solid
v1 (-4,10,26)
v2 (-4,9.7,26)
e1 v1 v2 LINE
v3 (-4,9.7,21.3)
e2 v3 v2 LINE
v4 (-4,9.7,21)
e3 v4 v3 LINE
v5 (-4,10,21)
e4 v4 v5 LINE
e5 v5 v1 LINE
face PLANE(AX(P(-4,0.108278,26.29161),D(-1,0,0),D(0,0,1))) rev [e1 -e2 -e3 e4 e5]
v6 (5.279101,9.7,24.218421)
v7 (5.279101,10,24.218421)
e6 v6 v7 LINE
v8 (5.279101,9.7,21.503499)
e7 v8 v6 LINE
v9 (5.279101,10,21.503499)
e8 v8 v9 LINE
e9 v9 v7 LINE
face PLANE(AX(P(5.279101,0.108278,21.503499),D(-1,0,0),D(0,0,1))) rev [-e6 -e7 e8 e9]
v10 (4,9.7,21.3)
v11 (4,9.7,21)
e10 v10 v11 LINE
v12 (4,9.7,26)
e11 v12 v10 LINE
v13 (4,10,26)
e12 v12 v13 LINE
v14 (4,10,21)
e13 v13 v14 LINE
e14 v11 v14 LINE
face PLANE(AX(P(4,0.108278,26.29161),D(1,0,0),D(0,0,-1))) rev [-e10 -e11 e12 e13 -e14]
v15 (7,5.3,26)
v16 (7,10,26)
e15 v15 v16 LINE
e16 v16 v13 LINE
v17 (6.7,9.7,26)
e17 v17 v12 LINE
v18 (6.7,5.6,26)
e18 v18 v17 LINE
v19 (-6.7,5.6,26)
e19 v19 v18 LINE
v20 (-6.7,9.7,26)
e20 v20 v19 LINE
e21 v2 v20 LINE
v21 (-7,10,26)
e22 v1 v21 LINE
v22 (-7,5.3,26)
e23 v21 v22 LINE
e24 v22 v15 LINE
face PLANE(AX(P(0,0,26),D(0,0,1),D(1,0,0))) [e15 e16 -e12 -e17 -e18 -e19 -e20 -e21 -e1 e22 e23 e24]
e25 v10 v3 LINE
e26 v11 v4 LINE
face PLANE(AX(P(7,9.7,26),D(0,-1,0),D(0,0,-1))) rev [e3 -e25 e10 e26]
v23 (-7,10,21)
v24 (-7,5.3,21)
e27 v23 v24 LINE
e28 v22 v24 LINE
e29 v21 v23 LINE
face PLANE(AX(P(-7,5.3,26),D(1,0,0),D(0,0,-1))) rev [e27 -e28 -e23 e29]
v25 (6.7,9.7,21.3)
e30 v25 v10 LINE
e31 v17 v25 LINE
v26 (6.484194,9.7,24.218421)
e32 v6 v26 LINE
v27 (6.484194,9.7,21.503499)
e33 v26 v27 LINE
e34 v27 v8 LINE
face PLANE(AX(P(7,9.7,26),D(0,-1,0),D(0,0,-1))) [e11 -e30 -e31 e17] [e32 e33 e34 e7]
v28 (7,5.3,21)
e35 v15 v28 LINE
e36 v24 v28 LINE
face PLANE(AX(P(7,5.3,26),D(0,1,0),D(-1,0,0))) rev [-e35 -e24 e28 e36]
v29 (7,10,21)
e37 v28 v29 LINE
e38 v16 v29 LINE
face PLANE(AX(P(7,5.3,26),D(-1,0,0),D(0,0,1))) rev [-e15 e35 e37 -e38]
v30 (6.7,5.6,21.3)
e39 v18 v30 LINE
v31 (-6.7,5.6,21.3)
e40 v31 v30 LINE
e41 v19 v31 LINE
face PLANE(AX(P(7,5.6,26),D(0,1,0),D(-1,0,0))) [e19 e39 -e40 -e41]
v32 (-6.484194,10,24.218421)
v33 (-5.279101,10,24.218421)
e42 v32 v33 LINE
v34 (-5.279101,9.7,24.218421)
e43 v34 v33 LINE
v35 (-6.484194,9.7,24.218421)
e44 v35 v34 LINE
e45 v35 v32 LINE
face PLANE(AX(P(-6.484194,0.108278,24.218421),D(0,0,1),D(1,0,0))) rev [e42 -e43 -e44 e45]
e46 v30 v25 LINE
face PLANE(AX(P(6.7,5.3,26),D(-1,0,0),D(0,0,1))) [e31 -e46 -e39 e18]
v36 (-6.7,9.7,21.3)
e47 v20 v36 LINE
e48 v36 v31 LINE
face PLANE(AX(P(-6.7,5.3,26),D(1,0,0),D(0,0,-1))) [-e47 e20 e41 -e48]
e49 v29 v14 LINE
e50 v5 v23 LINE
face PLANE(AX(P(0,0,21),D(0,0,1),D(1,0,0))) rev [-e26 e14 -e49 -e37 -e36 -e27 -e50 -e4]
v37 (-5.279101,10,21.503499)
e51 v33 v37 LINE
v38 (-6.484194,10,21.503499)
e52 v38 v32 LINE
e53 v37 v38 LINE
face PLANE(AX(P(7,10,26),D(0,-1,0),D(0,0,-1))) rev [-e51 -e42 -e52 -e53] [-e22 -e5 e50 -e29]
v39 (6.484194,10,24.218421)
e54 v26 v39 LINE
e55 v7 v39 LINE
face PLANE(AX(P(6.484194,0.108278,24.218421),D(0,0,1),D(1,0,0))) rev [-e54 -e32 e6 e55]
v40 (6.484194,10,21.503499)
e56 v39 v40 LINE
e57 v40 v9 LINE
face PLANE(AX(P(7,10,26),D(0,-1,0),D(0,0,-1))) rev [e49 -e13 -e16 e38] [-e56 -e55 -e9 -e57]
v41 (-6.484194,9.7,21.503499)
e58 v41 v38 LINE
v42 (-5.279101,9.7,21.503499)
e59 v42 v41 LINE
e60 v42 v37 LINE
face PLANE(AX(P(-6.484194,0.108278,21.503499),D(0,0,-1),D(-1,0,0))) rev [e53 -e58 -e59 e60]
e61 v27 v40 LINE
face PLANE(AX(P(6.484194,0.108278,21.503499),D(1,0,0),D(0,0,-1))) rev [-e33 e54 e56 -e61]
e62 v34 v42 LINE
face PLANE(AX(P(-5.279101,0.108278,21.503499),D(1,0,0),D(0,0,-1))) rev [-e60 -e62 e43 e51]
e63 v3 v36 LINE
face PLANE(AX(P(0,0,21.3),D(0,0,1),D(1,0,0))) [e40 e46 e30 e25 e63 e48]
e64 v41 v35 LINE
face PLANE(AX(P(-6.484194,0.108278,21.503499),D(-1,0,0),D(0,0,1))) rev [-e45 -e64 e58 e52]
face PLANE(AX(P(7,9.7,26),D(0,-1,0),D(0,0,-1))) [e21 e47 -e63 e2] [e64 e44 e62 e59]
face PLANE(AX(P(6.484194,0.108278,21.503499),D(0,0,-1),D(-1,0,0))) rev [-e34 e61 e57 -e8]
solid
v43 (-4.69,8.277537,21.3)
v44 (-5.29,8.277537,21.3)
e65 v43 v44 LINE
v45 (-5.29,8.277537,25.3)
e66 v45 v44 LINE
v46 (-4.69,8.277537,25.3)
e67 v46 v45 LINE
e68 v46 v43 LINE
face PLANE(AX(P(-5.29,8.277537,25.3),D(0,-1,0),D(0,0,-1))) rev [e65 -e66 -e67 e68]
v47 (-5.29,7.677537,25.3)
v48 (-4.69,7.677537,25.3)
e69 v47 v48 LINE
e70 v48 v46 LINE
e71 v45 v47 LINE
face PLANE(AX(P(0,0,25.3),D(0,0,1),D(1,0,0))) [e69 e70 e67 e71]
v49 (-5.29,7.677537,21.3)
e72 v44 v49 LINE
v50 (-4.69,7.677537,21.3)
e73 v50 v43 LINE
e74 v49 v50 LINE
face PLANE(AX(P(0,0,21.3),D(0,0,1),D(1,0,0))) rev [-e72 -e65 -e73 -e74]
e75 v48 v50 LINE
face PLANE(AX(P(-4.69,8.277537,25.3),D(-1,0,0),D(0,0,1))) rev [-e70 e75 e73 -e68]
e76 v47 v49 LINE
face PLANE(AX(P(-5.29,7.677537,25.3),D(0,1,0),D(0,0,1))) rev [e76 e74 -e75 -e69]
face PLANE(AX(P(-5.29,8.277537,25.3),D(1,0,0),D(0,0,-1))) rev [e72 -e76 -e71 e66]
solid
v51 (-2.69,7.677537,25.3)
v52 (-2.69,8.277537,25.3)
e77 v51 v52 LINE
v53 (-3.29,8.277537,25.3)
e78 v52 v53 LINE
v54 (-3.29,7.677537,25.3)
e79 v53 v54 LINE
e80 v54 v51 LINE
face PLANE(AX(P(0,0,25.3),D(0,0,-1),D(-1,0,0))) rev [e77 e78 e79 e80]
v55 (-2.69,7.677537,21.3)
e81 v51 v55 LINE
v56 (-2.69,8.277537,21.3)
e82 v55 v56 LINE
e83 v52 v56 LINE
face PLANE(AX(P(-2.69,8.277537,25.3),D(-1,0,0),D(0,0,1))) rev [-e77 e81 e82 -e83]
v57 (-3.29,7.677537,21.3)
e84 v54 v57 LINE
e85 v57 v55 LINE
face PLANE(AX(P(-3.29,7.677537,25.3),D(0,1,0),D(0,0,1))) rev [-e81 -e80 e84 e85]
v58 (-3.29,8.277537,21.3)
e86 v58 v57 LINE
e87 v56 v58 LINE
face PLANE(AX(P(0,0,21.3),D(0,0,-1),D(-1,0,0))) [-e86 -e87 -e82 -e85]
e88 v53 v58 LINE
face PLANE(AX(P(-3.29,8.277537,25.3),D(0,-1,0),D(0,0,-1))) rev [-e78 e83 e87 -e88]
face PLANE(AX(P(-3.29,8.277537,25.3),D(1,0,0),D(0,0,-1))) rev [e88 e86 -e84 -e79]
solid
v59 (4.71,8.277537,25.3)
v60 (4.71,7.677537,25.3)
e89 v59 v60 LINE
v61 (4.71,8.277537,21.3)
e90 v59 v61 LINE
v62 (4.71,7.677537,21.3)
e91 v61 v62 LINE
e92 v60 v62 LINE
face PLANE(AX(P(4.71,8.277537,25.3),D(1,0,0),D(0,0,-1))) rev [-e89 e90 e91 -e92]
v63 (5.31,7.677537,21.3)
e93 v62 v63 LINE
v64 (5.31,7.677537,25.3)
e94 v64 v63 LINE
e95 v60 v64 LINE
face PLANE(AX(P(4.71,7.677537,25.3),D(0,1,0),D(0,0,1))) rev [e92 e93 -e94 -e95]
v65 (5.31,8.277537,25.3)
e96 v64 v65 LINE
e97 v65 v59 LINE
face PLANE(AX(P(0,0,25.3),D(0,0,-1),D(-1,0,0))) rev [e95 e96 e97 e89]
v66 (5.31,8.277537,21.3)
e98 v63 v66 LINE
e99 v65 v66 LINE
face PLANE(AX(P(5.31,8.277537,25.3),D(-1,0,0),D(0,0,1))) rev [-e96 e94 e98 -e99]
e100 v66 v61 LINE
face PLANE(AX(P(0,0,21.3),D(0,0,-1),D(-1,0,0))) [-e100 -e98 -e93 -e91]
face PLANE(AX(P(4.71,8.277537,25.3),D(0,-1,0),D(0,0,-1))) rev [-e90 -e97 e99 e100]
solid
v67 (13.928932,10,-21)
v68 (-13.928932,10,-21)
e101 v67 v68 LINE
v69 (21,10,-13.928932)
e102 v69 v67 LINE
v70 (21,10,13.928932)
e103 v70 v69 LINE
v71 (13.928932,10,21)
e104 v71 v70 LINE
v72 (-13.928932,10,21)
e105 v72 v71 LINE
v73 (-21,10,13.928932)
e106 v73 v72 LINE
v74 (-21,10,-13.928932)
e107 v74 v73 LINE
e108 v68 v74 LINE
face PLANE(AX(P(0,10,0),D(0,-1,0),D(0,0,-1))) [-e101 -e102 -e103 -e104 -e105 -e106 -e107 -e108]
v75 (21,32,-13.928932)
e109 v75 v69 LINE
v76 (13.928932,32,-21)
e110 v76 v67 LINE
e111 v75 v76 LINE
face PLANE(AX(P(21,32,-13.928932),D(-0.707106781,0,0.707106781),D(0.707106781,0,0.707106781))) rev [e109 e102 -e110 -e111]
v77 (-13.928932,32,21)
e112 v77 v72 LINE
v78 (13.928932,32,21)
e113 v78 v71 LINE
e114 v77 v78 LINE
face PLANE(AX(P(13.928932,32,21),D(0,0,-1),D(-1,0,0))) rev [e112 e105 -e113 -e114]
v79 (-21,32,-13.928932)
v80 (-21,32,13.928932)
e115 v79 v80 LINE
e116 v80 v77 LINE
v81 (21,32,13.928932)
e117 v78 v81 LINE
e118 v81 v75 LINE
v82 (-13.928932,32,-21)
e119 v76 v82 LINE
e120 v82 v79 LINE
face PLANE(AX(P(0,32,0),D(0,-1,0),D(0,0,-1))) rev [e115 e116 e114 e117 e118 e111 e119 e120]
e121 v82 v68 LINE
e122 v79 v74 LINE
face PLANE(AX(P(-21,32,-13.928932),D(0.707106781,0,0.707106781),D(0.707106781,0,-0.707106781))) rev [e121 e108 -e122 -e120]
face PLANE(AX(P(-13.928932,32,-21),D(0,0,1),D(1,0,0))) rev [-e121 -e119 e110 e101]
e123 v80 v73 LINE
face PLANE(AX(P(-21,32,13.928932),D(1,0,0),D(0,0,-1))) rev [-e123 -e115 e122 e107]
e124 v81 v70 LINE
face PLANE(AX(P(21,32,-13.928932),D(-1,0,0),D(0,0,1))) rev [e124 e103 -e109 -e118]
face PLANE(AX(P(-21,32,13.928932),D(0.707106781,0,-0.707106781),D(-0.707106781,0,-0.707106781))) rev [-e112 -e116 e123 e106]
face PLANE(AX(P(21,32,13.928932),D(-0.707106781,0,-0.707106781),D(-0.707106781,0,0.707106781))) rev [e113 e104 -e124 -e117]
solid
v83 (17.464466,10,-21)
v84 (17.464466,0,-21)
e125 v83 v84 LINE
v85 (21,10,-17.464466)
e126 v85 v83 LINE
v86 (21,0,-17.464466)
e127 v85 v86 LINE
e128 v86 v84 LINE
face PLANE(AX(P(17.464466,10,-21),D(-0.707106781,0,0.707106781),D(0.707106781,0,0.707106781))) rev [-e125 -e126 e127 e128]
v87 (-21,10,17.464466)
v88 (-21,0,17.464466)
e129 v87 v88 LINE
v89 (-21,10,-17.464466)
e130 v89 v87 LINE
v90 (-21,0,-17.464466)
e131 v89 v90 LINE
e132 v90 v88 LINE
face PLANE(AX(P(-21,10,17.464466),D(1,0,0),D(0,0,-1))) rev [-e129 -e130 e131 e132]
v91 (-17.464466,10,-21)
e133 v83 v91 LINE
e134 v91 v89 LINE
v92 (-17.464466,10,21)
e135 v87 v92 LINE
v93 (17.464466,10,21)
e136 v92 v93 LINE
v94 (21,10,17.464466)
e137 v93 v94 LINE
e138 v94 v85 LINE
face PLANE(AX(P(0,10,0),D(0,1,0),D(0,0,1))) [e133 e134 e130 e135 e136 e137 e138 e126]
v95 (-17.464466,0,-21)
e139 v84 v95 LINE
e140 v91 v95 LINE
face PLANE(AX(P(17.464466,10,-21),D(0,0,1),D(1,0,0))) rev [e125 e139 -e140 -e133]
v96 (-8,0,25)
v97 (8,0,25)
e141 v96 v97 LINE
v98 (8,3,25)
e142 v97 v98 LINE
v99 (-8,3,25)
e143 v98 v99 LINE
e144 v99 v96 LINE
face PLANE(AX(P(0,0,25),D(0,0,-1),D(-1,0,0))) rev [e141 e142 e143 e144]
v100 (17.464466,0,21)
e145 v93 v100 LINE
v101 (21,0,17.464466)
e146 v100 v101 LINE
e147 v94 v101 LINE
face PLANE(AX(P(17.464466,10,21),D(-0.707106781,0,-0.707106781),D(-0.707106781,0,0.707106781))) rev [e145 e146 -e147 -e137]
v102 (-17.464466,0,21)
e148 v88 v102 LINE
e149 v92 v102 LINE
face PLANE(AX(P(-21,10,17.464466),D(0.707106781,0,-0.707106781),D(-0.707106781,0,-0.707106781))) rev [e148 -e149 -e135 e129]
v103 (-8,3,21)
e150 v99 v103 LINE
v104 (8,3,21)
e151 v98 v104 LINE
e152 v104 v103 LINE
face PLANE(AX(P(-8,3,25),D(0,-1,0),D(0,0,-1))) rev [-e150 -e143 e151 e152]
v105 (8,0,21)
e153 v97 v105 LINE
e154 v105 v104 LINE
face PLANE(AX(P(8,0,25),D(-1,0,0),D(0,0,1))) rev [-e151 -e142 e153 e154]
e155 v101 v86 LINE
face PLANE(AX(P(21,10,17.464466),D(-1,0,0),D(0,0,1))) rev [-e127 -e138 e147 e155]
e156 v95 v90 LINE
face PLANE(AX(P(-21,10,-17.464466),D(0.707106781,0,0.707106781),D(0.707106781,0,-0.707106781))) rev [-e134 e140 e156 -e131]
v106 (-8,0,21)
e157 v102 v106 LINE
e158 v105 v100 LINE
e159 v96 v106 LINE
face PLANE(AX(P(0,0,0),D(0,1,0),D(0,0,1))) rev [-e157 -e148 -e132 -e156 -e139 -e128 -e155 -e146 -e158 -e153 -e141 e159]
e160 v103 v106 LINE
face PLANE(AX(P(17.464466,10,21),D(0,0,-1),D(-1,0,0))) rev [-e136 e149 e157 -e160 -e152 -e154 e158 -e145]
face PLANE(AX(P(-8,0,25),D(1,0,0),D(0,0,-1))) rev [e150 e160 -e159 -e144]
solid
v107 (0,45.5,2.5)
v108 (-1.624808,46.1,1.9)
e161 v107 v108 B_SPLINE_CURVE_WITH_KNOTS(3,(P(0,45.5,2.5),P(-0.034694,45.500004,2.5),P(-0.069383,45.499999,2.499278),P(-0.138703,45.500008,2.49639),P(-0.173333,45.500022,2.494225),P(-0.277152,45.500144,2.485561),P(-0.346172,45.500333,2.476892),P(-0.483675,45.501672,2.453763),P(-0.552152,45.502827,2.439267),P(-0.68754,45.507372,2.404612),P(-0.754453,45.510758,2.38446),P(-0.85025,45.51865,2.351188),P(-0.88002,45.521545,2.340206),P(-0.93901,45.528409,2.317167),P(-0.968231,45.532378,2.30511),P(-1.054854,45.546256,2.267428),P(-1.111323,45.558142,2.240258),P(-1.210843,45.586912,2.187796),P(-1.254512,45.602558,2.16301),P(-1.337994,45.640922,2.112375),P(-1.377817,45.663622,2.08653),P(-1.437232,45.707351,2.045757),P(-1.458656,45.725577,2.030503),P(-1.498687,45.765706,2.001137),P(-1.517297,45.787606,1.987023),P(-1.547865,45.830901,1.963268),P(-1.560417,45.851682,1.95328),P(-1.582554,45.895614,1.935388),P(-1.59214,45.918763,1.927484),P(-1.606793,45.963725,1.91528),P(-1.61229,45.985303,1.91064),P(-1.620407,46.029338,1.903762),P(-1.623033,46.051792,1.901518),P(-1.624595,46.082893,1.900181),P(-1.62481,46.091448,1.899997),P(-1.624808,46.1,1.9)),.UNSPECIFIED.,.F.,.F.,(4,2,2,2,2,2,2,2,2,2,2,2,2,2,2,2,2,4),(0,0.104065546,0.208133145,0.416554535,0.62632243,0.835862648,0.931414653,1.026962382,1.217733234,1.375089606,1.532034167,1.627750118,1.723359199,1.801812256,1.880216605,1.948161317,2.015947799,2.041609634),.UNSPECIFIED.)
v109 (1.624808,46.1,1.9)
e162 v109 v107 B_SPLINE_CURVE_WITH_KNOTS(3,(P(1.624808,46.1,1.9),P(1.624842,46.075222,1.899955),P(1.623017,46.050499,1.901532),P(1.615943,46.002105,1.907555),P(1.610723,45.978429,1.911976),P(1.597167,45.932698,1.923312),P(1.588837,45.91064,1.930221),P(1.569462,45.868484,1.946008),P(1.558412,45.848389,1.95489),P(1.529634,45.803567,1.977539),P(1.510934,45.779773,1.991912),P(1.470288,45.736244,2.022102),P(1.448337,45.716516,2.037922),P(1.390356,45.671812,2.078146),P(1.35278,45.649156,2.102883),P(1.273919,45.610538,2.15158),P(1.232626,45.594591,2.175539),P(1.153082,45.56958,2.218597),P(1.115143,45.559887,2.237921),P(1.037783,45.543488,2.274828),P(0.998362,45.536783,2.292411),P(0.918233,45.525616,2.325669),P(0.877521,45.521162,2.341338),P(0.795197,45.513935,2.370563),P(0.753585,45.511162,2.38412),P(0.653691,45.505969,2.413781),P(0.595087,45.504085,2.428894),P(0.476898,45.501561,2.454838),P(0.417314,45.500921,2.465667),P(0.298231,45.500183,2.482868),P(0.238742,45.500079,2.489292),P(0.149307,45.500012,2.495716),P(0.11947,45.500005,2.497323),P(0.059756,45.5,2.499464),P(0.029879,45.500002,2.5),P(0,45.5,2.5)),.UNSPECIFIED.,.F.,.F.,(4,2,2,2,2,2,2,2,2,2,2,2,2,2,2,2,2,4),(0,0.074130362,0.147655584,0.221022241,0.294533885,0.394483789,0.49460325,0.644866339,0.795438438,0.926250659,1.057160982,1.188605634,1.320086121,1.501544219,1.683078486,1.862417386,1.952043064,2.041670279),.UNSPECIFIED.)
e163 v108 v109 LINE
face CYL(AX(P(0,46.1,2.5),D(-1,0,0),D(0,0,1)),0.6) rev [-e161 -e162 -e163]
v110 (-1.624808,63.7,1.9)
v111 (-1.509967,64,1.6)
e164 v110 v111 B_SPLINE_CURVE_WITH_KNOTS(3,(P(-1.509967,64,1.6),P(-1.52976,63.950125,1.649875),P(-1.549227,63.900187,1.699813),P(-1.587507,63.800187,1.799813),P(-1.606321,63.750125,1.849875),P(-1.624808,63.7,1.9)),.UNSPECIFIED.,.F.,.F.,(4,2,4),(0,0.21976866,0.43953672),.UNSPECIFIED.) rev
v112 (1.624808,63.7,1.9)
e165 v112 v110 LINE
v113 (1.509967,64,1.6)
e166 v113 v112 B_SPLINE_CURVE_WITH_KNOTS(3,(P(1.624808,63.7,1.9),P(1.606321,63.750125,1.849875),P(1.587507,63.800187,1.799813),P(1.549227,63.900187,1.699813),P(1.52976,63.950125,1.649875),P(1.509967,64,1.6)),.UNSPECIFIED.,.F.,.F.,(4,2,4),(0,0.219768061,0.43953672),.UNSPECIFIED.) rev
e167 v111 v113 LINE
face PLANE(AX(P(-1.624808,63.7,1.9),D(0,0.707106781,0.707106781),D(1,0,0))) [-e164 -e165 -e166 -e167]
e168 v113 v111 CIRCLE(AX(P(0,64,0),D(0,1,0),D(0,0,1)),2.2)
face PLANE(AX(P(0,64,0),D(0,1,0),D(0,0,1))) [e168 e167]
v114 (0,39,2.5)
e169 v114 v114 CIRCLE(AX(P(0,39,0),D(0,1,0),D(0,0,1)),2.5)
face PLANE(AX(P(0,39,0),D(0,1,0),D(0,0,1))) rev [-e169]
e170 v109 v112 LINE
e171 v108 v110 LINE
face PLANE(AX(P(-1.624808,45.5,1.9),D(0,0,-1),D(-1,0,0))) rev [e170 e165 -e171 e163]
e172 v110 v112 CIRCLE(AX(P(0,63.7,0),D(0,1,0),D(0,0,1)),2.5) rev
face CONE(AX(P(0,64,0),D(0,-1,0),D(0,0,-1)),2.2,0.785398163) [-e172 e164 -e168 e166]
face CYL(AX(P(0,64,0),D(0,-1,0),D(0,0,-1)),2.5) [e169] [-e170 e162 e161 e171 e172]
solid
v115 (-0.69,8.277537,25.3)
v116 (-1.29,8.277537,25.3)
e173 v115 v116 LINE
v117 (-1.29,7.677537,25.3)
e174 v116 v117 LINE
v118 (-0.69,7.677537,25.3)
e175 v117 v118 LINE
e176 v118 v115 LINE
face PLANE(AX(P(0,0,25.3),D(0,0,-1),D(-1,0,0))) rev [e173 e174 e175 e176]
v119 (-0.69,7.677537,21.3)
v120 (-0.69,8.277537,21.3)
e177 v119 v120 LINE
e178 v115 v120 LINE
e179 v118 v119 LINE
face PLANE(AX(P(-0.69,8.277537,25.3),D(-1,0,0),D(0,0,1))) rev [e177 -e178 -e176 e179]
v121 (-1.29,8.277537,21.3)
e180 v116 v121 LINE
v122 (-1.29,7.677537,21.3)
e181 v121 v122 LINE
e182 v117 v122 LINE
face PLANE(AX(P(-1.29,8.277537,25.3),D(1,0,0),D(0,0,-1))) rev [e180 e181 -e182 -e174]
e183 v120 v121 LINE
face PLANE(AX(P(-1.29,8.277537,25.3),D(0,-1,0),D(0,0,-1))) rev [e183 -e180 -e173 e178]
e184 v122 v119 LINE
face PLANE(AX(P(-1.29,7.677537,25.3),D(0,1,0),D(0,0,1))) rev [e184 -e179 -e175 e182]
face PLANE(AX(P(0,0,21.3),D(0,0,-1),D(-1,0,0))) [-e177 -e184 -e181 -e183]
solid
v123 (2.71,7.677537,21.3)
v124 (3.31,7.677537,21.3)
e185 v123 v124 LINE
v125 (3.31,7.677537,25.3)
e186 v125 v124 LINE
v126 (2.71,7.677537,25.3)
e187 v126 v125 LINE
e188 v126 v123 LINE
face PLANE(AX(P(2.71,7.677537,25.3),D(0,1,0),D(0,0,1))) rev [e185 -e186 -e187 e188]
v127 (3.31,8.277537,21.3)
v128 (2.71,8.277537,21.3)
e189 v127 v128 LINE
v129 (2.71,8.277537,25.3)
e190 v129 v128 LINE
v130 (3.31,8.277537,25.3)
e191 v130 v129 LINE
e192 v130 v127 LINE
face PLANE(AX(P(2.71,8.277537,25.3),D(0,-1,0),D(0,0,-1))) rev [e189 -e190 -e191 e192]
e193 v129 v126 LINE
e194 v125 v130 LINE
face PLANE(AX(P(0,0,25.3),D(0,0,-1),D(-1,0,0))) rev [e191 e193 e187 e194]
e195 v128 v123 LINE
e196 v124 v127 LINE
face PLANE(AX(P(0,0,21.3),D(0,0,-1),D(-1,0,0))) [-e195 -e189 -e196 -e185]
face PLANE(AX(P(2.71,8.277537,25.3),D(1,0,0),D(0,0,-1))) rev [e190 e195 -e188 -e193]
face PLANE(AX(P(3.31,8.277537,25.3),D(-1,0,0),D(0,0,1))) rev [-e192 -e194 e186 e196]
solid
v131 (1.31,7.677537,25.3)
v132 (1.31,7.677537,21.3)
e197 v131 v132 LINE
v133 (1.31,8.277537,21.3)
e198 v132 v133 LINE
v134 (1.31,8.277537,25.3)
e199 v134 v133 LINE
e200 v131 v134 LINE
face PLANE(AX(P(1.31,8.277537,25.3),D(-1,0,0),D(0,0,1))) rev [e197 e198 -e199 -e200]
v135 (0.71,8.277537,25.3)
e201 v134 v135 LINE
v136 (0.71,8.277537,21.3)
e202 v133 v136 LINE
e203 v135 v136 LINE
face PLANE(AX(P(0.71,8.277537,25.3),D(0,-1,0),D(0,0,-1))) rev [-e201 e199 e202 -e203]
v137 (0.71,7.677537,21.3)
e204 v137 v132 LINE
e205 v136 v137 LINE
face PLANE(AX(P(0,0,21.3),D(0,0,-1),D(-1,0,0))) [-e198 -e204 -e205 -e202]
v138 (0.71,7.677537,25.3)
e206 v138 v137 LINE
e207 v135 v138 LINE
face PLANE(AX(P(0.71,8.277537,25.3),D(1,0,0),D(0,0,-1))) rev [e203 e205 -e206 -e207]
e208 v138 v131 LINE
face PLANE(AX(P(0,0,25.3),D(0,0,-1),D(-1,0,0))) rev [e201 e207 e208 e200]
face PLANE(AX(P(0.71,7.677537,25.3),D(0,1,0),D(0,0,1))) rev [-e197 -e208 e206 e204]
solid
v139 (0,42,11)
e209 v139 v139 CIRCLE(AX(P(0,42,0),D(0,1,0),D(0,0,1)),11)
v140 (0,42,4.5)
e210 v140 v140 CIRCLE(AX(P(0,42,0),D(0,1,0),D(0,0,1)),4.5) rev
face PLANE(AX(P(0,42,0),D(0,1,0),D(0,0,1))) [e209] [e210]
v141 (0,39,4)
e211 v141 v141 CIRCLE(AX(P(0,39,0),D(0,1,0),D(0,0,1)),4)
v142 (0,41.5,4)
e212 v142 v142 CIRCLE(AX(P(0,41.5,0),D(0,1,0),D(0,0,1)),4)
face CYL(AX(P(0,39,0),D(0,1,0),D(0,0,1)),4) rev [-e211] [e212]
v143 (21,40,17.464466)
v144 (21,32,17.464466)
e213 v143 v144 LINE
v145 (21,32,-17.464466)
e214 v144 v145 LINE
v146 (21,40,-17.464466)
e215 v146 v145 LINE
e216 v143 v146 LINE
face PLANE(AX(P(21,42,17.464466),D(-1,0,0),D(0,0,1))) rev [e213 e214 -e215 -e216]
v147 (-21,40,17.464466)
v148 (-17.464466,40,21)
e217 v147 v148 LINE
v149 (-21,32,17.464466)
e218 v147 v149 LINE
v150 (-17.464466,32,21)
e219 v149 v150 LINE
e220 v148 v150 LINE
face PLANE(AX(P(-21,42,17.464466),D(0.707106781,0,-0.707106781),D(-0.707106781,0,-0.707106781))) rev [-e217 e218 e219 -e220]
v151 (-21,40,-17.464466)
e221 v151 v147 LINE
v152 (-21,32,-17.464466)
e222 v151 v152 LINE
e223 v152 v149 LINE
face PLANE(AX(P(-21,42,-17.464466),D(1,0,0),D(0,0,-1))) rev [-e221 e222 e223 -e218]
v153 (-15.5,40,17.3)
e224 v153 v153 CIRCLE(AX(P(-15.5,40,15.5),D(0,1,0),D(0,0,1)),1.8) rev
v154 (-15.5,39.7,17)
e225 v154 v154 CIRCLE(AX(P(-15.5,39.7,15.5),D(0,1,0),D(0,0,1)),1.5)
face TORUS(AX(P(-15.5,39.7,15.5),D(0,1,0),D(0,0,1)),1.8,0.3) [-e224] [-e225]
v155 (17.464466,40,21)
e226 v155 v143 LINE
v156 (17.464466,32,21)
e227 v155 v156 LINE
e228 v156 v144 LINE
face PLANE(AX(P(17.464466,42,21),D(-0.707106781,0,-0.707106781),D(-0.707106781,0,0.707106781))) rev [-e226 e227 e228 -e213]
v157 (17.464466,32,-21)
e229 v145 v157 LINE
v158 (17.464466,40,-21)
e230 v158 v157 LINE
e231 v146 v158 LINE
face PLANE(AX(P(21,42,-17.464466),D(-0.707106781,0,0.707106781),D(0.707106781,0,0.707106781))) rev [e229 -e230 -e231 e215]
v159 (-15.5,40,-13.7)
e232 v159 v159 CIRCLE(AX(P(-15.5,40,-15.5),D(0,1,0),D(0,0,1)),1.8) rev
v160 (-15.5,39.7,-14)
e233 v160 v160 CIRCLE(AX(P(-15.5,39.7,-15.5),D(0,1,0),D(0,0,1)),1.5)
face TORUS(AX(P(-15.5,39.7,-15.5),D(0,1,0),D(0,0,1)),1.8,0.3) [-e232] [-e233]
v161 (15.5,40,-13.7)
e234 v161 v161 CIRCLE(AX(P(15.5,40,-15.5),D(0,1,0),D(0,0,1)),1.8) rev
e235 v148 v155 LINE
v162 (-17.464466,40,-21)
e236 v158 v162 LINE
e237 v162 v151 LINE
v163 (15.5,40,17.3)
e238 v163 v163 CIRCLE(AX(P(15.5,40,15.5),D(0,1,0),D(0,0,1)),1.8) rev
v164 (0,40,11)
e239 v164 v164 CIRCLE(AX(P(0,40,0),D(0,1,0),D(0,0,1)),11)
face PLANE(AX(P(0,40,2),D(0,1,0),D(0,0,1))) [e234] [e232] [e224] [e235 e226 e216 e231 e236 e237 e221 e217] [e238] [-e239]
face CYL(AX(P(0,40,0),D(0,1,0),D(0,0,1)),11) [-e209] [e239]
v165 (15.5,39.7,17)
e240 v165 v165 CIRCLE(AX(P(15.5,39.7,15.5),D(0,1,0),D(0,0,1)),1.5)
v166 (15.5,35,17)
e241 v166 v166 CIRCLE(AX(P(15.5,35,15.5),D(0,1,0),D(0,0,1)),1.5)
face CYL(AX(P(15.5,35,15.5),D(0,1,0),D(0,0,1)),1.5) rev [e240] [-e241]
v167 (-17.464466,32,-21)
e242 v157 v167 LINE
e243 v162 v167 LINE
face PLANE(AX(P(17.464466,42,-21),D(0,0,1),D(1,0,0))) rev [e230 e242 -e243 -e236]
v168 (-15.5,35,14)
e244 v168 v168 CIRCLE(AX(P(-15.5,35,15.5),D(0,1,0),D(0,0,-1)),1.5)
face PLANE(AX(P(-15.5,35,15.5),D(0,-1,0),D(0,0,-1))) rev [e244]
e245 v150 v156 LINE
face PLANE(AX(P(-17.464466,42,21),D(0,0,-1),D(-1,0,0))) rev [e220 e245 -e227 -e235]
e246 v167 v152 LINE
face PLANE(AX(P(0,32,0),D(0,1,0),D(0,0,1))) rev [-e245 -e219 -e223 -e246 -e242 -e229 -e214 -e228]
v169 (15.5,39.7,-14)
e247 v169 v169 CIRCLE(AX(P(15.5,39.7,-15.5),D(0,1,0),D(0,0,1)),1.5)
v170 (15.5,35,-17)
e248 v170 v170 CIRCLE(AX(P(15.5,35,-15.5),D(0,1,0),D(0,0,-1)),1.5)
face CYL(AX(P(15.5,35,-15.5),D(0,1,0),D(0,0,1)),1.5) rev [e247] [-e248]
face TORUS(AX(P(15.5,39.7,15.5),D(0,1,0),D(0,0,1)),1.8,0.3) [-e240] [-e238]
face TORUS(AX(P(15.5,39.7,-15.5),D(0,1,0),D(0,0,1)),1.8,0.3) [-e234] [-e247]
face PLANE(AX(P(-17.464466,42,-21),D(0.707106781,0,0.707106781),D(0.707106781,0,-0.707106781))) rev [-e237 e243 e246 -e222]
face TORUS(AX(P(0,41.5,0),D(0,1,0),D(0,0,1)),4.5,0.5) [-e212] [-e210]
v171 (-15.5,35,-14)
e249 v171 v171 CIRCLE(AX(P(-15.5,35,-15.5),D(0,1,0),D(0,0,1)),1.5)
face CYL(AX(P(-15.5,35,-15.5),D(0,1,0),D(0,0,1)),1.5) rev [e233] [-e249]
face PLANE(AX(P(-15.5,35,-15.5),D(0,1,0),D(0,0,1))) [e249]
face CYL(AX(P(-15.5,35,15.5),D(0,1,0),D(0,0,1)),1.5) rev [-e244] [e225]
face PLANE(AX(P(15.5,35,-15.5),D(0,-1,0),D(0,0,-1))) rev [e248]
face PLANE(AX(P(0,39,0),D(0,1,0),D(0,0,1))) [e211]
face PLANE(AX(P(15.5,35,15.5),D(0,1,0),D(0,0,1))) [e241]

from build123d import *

# Parameters (mm, degrees)
BOTTOM_DEPTH           = 10
MIDDLE_DEPTH           = 22
TOP_DEPTH              = 10
SKETCH4_W              = 16
SKETCH4_H              = 3
JST_EXTENSION_DEPTH    = 4
SKETCH5_OUTSIDE_W      = 59.026
SKETCH5_OUTSIDE_H      = 63.026
SKETCH5_OUTSIDE_R      = 11
TOP_TRIM_DEPTH         = 2
SKETCH9_R              = 1.5
MOUNT_DEPTH            = 5
SKETCH6_R              = 4
SHAFT_RECESS_DEPTH     = 3
SKETCH7_R              = 2.5
SHAFT_DEPTH            = 25
D_SHAFT_TRIM_DEPTH     = 18.5
SHAFT_TOP_CHAMFER_SIZE = 0.3
SKETCH10_W             = 14
SKETCH10_H             = 4.7
JST_DEPTH              = 5
JST_SHELL_T            = -0.3
SKETCH11_W             = 8
SKETCH11_H             = 5.2916096
SKETCH11_W_2           = 1.205092783
SKETCH11_H_2           = 2.714921674
JST_SHAPER_DEPTH       = 0.3
SKETCH12_W             = 0.6
SKETCH12_H             = 0.6
JST_PINS_DEPTH         = 4
JST_PINS_2_DEPTH       = 4
JST_PINS_3_DEPTH       = 4
JST_PINS_4_DEPTH       = 4
JST_PINS_5_DEPTH       = 4
JST_PINS_6_DEPTH       = 4
FILLET2_R              = 0.5
FILLET3_R              = 0.3
FILLET4_R              = 0.6


with BuildPart() as part:
    # Sketch1 → bottom (new body)
    with BuildSketch(Plane(origin=(0, 0, 0), x_dir=(1, 0, 0), z_dir=(0, 1, 0))):
        Polygon((-21, 17.464466094), (-17.464466094, 21), (17.464466094, 21), (21, 17.464466094), (21, -17.464466094), (17.464466094, -21), (-17.464466094, -21), (-21, -17.464466094), align=None)
    extrude(amount=BOTTOM_DEPTH)

    # Sketch4 → JST_extension (add)
    with BuildSketch(Plane.XY.offset(21)):
        with Locations((0, 1.5)):
            Rectangle(SKETCH4_W, SKETCH4_H)
    extrude(amount=JST_EXTENSION_DEPTH)


with BuildPart() as body_2:
    # Sketch2 → middle (new body)
    with BuildSketch(Plane(origin=(0, 10, 0), x_dir=(1, 0, 0), z_dir=(0, 1, 0))):
        Polygon((-21, 13.928932188), (-13.928932188, 21), (13.928932188, 21), (21, 13.928932188), (21, -13.928932188), (13.928932188, -21), (-13.928932188, -21), (-21, -13.928932188), align=None)
    extrude(amount=MIDDLE_DEPTH)


with BuildPart() as body_3:
    # Sketch3 → top (new body)
    with BuildSketch(Plane(origin=(0, 32, 0), x_dir=(1, 0, 0), z_dir=(0, 1, 0))):
        Polygon((-21, 17.464466094), (-21, -17.464466094), (-17.464466094, -21), (17.464466094, -21), (21, -17.464466094), (21, 17.464466094), (17.464466094, 21), (-17.464466094, 21), align=None)
    extrude(amount=TOP_DEPTH)

    # Sketch5 outside → top trim (cut)
    with BuildSketch(Plane(origin=(0, 42, 0), x_dir=(1, 0, 0), z_dir=(0, 1, 0))):
        with Locations((0, -2)):
            Rectangle(SKETCH5_OUTSIDE_W, SKETCH5_OUTSIDE_H)
        with Locations(Location((0, 0, 0), (0, 0, 270))):
            Circle(SKETCH5_OUTSIDE_R, mode=Mode.SUBTRACT)
    extrude(amount=-TOP_TRIM_DEPTH, mode=Mode.SUBTRACT)

    # Sketch9 → mount (cut)
    with BuildSketch(Plane(origin=(0, 40, 0), x_dir=(1, 0, 0), z_dir=(0, 1, 0))):
        with Locations(Location((-15.5, 15.5, 0), (0, 0, 270))):
            Circle(SKETCH9_R)
        with Locations(Location((15.5, 15.5, 0), (0, 0, 90))):
            Circle(SKETCH9_R)
        with Locations(Location((-15.5, -15.5, 0), (0, 0, 90))):
            Circle(SKETCH9_R)
        with Locations(Location((15.5, -15.5, 0), (0, 0, 270))):
            Circle(SKETCH9_R)
    extrude(amount=-MOUNT_DEPTH, mode=Mode.SUBTRACT)

    # Sketch6 → shaft_recess (cut)
    with BuildSketch(Plane(origin=(0, 42, 0), x_dir=(1, 0, 0), z_dir=(0, 1, 0))):
        with Locations(Location((0, 0, 0), (0, 0, 270))):
            Circle(SKETCH6_R)
    extrude(amount=-SHAFT_RECESS_DEPTH, mode=Mode.SUBTRACT)

    # Fillet2
    fillet2_edges = [body_3.edges().sort_by_distance(p)[0] for p in [
        (0, 42, -4),
    ]]
    fillet(fillet2_edges, radius=FILLET2_R)

    # Fillet3
    fillet3_edges = [body_3.edges().sort_by_distance(p)[0] for p in [
        (15.5, 40, -14),
        (-15.5, 40, 17),
        (15.5, 40, 14),
        (-15.5, 40, -17),
    ]]
    fillet(fillet3_edges, radius=FILLET3_R)


with BuildPart() as body_4:
    # Sketch7 → shaft (new body)
    with BuildSketch(Plane(origin=(0, 39, 0), x_dir=(1, 0, 0), z_dir=(0, 1, 0))):
        with Locations(Location((0, 0, 0), (0, 0, 270))):
            Circle(SKETCH7_R)
    extrude(amount=SHAFT_DEPTH)

    # Sketch8 → D_shaft_trim (cut)
    with BuildSketch(Plane(origin=(0, 64, 0), x_dir=(1, 0, 0), z_dir=(0, 1, 0))):
        with BuildLine():
            Line((-1.624807681, -1.9), (1.624807681, -1.9))
            ThreePointArc((1.624807681, -1.9), (0, -2.5), (-1.624807681, -1.9))
        make_face()
    extrude(amount=-D_SHAFT_TRIM_DEPTH, mode=Mode.SUBTRACT)

    # shaft_top_chamfer
    shaft_top_chamfer_edges = [body_4.edges().sort_by_distance(p)[0] for p in [
        (0, 64, -2.5),
        (0, 64, 1.9),
    ]]
    chamfer(shaft_top_chamfer_edges, length=SHAFT_TOP_CHAMFER_SIZE)

    # Fillet4
    fillet4_edges = [body_4.edges().sort_by_distance(p)[0] for p in [
        (0, 45.5, 1.9),
    ]]
    fillet(fillet4_edges, radius=FILLET4_R - 0.0001)  # a hair under: the kernel refuses the full size


with BuildPart() as body_5:
    # Sketch10 → JST (new body)
    with BuildSketch(Plane.XY.offset(21)):
        with Locations((0, 7.65)):
            Rectangle(SKETCH10_W, SKETCH10_H)
    extrude(amount=JST_DEPTH)

    # JST_shell
    jst_shell_openings = [body_5.faces().sort_by_distance(p)[0] for p in [
        (0, 7.65, 26),
    ]]
    offset(amount=JST_SHELL_T, openings=jst_shell_openings, kind=Kind.INTERSECTION)

    # Sketch11 → JST_shaper (cut)
    with BuildSketch(Plane(origin=(0, 10, 0), x_dir=(1, 0, 0), z_dir=(0, 1, 0))):
        with Locations((0, -23.6458048)):
            Rectangle(SKETCH11_W, SKETCH11_H)
        with Locations((5.881647833, -22.86096009)):
            Rectangle(SKETCH11_W_2, SKETCH11_H_2)
        with Locations((-5.881647833, -22.86096009)):
            Rectangle(SKETCH11_W_2, SKETCH11_H_2)
    extrude(amount=-JST_SHAPER_DEPTH, mode=Mode.SUBTRACT)


with BuildPart() as body_6:
    # Sketch12 → JST_pins (new body)
    with BuildSketch(Plane.XY.offset(21.3)):
        with Locations((-2.99, 7.97753674)):
            Rectangle(SKETCH12_W, SKETCH12_H)
    extrude(amount=JST_PINS_DEPTH)


with BuildPart() as body_7:
    # Sketch12 → JST_pins 2 (new body)
    with BuildSketch(Plane.XY.offset(21.3)):
        with Locations((-4.99, 7.97753674)):
            Rectangle(SKETCH12_W, SKETCH12_H)
    extrude(amount=JST_PINS_2_DEPTH)


with BuildPart() as body_8:
    # Sketch12 → JST_pins 3 (new body)
    with BuildSketch(Plane.XY.offset(21.3)):
        with Locations((-0.99, 7.97753674)):
            Rectangle(SKETCH12_W, SKETCH12_H)
    extrude(amount=JST_PINS_3_DEPTH)


with BuildPart() as body_9:
    # Sketch12 → JST_pins 4 (new body)
    with BuildSketch(Plane.XY.offset(21.3)):
        with Locations((1.01, 7.97753674)):
            Rectangle(SKETCH12_W, SKETCH12_H)
    extrude(amount=JST_PINS_4_DEPTH)


with BuildPart() as body_10:
    # Sketch12 → JST_pins 5 (new body)
    with BuildSketch(Plane.XY.offset(21.3)):
        with Locations((3.01, 7.97753674)):
            Rectangle(SKETCH12_W, SKETCH12_H)
    extrude(amount=JST_PINS_5_DEPTH)


with BuildPart() as body_11:
    # Sketch12 → JST_pins 6 (new body)
    with BuildSketch(Plane.XY.offset(21.3)):
        with Locations((5.01, 7.97753674)):
            Rectangle(SKETCH12_W, SKETCH12_H)
    extrude(amount=JST_PINS_6_DEPTH)


solid = Compound([part.part, body_2.part, body_3.part, body_4.part, body_5.part, body_6.part, body_7.part, body_8.part, body_9.part, body_10.part, body_11.part])
